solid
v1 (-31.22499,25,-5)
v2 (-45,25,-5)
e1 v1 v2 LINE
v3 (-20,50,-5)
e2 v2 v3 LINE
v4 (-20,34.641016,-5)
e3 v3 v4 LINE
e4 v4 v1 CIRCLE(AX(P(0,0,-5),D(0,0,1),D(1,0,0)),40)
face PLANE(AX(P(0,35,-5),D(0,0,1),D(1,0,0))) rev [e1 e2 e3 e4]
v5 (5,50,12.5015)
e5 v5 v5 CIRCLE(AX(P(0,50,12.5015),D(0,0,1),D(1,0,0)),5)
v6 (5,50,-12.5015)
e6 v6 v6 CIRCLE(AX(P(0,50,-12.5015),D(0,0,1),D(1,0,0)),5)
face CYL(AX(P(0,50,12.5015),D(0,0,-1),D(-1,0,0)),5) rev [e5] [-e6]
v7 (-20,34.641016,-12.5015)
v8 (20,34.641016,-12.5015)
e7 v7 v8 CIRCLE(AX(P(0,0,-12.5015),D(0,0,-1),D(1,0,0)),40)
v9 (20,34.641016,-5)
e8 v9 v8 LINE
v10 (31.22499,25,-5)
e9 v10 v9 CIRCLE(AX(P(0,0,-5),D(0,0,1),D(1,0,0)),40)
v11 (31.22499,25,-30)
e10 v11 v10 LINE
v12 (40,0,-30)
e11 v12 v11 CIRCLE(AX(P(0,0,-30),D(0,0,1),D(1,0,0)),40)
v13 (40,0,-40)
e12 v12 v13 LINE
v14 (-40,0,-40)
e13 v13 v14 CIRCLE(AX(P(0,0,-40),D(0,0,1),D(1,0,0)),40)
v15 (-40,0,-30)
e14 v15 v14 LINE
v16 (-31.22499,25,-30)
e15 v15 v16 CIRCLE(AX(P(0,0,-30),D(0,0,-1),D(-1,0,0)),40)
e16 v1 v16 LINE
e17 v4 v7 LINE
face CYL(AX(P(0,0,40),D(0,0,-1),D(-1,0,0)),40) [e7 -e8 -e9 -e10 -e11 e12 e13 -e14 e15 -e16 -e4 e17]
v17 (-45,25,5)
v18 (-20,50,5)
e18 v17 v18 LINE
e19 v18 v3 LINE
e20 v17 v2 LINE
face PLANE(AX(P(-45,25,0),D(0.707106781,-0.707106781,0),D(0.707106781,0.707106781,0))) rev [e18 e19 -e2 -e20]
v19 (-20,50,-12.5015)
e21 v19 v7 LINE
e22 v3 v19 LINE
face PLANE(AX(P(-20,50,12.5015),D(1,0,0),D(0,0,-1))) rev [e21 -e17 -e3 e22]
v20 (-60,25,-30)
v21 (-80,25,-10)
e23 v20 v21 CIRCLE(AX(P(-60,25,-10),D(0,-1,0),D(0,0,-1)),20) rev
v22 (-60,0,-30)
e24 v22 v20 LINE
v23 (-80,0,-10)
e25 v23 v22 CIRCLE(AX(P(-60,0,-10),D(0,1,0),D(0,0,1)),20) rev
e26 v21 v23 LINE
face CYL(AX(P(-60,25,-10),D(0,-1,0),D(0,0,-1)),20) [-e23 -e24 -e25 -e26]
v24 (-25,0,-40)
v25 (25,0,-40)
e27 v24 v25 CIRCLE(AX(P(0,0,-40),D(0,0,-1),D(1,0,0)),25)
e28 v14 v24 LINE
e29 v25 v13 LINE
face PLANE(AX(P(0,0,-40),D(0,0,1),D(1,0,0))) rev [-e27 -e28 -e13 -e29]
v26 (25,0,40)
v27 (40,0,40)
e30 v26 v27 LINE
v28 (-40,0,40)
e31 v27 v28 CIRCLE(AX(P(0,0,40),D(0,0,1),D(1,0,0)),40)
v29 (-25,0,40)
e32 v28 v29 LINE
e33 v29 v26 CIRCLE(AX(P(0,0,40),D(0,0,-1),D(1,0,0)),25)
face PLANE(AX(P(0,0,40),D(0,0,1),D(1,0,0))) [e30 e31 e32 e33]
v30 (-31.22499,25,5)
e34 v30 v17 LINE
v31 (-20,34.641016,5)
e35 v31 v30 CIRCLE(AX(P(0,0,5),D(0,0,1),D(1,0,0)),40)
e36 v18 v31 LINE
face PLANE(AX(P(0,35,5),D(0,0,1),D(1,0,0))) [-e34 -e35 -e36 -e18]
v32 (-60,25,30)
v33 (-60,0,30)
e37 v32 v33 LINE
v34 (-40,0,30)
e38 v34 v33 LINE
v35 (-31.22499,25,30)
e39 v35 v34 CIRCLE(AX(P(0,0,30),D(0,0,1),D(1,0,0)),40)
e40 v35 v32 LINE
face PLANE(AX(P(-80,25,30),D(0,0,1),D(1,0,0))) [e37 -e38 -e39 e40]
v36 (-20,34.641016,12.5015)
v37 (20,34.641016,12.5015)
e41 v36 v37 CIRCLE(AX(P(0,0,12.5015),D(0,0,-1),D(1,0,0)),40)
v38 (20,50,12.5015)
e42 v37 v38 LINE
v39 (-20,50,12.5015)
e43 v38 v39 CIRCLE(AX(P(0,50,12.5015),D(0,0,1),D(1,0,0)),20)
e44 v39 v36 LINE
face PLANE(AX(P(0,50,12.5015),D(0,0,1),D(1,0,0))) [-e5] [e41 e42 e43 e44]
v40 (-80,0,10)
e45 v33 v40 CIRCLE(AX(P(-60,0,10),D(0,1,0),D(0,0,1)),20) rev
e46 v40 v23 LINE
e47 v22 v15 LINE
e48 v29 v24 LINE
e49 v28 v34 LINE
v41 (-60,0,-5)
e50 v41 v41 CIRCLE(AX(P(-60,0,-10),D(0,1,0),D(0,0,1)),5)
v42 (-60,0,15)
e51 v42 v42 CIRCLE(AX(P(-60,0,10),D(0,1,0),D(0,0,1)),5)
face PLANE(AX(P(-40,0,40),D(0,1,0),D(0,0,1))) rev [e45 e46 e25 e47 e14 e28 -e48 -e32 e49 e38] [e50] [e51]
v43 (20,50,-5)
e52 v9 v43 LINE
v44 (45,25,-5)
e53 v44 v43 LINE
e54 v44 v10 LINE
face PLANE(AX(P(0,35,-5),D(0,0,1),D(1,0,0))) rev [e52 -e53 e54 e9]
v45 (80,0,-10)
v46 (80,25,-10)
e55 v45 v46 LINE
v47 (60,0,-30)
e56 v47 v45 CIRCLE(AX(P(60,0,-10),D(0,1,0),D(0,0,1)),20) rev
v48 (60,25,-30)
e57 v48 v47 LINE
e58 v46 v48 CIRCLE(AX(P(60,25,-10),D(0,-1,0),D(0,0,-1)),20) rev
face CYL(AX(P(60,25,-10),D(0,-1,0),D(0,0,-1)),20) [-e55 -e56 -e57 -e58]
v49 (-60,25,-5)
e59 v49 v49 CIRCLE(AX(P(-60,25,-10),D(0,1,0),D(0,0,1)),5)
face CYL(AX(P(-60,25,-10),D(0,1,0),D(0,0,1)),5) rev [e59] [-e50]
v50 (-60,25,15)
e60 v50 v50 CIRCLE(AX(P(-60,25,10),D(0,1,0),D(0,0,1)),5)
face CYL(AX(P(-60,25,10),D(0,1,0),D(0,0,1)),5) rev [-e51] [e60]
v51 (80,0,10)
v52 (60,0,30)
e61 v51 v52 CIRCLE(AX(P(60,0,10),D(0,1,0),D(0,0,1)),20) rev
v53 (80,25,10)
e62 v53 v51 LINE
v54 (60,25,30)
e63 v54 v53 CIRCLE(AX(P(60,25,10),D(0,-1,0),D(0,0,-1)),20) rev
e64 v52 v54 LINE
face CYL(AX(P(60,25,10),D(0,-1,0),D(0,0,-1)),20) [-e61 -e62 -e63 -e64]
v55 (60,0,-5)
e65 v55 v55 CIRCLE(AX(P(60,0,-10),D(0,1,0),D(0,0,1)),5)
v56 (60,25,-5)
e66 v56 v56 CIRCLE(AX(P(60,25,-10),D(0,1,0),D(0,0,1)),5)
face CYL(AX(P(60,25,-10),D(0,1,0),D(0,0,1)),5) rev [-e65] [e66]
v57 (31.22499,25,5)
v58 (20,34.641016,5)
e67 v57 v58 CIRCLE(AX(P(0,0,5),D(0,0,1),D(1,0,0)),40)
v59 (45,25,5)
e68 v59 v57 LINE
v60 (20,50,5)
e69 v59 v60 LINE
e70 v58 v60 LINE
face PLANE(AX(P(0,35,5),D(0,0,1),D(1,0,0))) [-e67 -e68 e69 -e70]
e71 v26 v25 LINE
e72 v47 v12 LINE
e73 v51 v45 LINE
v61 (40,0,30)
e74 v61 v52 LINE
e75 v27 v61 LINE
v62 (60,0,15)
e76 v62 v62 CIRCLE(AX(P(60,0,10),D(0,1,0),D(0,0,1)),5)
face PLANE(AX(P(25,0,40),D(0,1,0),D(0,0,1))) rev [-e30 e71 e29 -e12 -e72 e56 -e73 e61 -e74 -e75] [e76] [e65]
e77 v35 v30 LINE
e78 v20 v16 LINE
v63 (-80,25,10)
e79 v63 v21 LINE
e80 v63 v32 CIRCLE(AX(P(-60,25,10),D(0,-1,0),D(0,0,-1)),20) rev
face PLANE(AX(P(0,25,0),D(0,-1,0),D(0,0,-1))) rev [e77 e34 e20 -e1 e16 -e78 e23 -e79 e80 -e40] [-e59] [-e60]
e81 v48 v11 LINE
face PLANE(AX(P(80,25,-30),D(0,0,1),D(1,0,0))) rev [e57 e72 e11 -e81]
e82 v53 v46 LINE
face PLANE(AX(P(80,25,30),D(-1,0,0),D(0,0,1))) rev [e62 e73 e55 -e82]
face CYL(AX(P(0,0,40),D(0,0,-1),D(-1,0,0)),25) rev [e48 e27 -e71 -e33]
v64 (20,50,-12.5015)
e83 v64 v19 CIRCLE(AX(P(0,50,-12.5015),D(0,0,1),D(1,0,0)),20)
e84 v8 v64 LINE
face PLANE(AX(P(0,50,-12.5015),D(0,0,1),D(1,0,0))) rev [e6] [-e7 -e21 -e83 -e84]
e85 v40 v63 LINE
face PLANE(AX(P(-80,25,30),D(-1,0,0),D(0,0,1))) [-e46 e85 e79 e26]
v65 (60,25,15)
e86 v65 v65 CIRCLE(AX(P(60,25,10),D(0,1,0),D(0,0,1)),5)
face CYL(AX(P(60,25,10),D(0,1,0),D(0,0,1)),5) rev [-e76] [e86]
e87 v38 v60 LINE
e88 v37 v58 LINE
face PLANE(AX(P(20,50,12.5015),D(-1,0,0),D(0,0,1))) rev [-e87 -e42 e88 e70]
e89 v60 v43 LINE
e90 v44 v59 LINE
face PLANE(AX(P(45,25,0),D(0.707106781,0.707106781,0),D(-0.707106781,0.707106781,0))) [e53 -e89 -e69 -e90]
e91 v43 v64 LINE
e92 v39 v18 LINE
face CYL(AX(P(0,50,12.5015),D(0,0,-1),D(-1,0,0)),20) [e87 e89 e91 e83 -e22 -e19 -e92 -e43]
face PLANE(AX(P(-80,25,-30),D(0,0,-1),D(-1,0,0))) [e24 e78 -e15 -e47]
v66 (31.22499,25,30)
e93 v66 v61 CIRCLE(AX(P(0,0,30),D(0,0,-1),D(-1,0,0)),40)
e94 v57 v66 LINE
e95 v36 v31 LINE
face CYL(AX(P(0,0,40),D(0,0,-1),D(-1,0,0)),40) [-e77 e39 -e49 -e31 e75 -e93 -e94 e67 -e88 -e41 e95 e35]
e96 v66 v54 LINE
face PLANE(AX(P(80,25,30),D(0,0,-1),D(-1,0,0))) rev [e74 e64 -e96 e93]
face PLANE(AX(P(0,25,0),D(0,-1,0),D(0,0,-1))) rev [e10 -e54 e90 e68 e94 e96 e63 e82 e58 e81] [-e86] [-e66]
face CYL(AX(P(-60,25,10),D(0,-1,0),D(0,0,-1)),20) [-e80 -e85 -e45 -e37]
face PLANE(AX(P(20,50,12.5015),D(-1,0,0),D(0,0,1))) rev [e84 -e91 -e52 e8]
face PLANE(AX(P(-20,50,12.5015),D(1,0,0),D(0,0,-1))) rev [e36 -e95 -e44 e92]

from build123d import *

# Parameters (mm, degrees)
BOSS_EXTRUDE1_DEPTH        = 40
SKETCH2_W                  = 70
SKETCH2_H                  = 60
BOSS_EXTRUDE2_DEPTH        = 25
FILLET1_R                  = 20
F_10_0_10_DIAMETER_HOLE1_D = 10
FILLET1_OF_MIRROR1_R       = 20
DELETEFACE1_START          = -30
DELETEFACE1_DEPTH          = 60
SKETCH5_R                  = 5
BOSS_EXTRUDE3_DEPTH        = 12.5015
RIB1_REACH                 = 115.578
SKETCH6_WALL_W             = 264.511672892
SKETCH6_WALL_H             = 10


# Read off the part's stored shape, not the designer's step: DeleteFace1
with BuildPart() as part:
    # Sketch1 → Boss-Extrude1 (new, symmetric)
    with BuildSketch(Plane.XY):
        with BuildLine():
            Line((-40, 0), (-25, 0))
            ThreePointArc((-25, 0), (0, 25), (25, 0))
            Line((25, 0), (40, 0))
            ThreePointArc((40, 0), (0, 40), (-40, 0))
        make_face()
    extrude(amount=BOSS_EXTRUDE1_DEPTH, both=True)

    # Sketch2 → Boss-Extrude2 (add)
    with BuildSketch(Plane.XZ):
        with Locations((-45, 0)):
            Rectangle(SKETCH2_W, SKETCH2_H)
    boss_extrude2 = extrude(amount=-BOSS_EXTRUDE2_DEPTH)

    # Fillet1
    fillet1_edges = [part.edges().sort_by_distance(p)[0] for p in [
        (-80, 12.5, 30),
        (-80, 12.5, -30),
    ]]
    fillet(fillet1_edges, radius=FILLET1_R)

    # Ø10.0 (10) Diameter Hole1 (through all)
    with Locations(Plane(origin=(0, 25, 0), x_dir=(1, 0, 0), z_dir=(0, 1, 0))):
        with Locations((-60, -10), (-60, 10)):
            f_10_0_10_diameter_hole1 = Hole(F_10_0_10_DIAMETER_HOLE1_D / 2)

    # Mirror1: Boss-Extrude2, Ø10.0 (10) Diameter Hole1 across plane
    add(boss_extrude2.mirror(Plane(origin=(0, 0, 0), x_dir=(0, 0, 1), z_dir=(1, 0, 0))))
    add(f_10_0_10_diameter_hole1.mirror(Plane(origin=(0, 0, 0), x_dir=(0, 0, 1), z_dir=(1, 0, 0))), mode=Mode.SUBTRACT)

    # Fillet1 of Mirror1
    fillet1_of_mirror1_edges = [part.edges().sort_by_distance(p)[0] for p in [
        (80, 12.5, 30),
        (80, 12.5, -30),
    ]]
    fillet(fillet1_of_mirror1_edges, radius=FILLET1_OF_MIRROR1_R)

    # DeleteFace1 outline → DeleteFace1 (cut)
    with BuildSketch(Plane.XY.offset(DELETEFACE1_START)):
        with BuildLine():
            ThreePointArc((25, 0), (20.916500663, 13.693063938), (10, 22.912878475))
            Line((10, 22.912878475), (10, 0))
            Line((10, 0), (25, 0))
        make_face()
        with BuildLine():
            ThreePointArc((-10, 22.912878475), (-20.916500663, 13.693063938), (-25, 0))
            Line((-25, 0), (-10, 0))
            Line((-10, 0), (-10, 22.912878475))
        make_face()
    extrude(amount=DELETEFACE1_DEPTH, mode=Mode.SUBTRACT)

    # Sketch5 → Boss-Extrude3 (add, symmetric)
    with BuildSketch(Plane.XY):
        with BuildLine():
            Line((-20, 50), (-20, 34.641016151))
            ThreePointArc((-20, 34.641016151), (0, 40), (20, 34.641016151))
            Line((20, 34.641016151), (20, 50))
            ThreePointArc((20, 50), (0, 70), (-20, 50))
        make_face()
        with Locations((0, 50)):
            Circle(SKETCH5_R, mode=Mode.SUBTRACT)
    extrude(amount=BOSS_EXTRUDE3_DEPTH, both=True)

    # Sketch6 wall → Rib1 (add, up to next)
    with BuildSketch(Plane(origin=(-32.5, 37.5, 0), x_dir=(0.707106781187, 0.707106781187, 0), z_dir=(-0.707106781187, 0.707106781187, 0)), mode=Mode.PRIVATE) as rib1_sk1:
        Rectangle(SKETCH6_WALL_W, SKETCH6_WALL_H)
    rib1_tool1 = extrude(rib1_sk1.sketch, amount=-RIB1_REACH, mode=Mode.PRIVATE) - part.part
    rib1 = rib1_tool1.solids().sort_by_distance((-32.5, 37.5, 0))[0]
    add(rib1)

    # Mirror2: Rib1 across plane
    add(rib1.mirror(Plane(origin=(0, 0, 0), x_dir=(0, 0, 1), z_dir=(1, 0, 0))))


solid = part.part
